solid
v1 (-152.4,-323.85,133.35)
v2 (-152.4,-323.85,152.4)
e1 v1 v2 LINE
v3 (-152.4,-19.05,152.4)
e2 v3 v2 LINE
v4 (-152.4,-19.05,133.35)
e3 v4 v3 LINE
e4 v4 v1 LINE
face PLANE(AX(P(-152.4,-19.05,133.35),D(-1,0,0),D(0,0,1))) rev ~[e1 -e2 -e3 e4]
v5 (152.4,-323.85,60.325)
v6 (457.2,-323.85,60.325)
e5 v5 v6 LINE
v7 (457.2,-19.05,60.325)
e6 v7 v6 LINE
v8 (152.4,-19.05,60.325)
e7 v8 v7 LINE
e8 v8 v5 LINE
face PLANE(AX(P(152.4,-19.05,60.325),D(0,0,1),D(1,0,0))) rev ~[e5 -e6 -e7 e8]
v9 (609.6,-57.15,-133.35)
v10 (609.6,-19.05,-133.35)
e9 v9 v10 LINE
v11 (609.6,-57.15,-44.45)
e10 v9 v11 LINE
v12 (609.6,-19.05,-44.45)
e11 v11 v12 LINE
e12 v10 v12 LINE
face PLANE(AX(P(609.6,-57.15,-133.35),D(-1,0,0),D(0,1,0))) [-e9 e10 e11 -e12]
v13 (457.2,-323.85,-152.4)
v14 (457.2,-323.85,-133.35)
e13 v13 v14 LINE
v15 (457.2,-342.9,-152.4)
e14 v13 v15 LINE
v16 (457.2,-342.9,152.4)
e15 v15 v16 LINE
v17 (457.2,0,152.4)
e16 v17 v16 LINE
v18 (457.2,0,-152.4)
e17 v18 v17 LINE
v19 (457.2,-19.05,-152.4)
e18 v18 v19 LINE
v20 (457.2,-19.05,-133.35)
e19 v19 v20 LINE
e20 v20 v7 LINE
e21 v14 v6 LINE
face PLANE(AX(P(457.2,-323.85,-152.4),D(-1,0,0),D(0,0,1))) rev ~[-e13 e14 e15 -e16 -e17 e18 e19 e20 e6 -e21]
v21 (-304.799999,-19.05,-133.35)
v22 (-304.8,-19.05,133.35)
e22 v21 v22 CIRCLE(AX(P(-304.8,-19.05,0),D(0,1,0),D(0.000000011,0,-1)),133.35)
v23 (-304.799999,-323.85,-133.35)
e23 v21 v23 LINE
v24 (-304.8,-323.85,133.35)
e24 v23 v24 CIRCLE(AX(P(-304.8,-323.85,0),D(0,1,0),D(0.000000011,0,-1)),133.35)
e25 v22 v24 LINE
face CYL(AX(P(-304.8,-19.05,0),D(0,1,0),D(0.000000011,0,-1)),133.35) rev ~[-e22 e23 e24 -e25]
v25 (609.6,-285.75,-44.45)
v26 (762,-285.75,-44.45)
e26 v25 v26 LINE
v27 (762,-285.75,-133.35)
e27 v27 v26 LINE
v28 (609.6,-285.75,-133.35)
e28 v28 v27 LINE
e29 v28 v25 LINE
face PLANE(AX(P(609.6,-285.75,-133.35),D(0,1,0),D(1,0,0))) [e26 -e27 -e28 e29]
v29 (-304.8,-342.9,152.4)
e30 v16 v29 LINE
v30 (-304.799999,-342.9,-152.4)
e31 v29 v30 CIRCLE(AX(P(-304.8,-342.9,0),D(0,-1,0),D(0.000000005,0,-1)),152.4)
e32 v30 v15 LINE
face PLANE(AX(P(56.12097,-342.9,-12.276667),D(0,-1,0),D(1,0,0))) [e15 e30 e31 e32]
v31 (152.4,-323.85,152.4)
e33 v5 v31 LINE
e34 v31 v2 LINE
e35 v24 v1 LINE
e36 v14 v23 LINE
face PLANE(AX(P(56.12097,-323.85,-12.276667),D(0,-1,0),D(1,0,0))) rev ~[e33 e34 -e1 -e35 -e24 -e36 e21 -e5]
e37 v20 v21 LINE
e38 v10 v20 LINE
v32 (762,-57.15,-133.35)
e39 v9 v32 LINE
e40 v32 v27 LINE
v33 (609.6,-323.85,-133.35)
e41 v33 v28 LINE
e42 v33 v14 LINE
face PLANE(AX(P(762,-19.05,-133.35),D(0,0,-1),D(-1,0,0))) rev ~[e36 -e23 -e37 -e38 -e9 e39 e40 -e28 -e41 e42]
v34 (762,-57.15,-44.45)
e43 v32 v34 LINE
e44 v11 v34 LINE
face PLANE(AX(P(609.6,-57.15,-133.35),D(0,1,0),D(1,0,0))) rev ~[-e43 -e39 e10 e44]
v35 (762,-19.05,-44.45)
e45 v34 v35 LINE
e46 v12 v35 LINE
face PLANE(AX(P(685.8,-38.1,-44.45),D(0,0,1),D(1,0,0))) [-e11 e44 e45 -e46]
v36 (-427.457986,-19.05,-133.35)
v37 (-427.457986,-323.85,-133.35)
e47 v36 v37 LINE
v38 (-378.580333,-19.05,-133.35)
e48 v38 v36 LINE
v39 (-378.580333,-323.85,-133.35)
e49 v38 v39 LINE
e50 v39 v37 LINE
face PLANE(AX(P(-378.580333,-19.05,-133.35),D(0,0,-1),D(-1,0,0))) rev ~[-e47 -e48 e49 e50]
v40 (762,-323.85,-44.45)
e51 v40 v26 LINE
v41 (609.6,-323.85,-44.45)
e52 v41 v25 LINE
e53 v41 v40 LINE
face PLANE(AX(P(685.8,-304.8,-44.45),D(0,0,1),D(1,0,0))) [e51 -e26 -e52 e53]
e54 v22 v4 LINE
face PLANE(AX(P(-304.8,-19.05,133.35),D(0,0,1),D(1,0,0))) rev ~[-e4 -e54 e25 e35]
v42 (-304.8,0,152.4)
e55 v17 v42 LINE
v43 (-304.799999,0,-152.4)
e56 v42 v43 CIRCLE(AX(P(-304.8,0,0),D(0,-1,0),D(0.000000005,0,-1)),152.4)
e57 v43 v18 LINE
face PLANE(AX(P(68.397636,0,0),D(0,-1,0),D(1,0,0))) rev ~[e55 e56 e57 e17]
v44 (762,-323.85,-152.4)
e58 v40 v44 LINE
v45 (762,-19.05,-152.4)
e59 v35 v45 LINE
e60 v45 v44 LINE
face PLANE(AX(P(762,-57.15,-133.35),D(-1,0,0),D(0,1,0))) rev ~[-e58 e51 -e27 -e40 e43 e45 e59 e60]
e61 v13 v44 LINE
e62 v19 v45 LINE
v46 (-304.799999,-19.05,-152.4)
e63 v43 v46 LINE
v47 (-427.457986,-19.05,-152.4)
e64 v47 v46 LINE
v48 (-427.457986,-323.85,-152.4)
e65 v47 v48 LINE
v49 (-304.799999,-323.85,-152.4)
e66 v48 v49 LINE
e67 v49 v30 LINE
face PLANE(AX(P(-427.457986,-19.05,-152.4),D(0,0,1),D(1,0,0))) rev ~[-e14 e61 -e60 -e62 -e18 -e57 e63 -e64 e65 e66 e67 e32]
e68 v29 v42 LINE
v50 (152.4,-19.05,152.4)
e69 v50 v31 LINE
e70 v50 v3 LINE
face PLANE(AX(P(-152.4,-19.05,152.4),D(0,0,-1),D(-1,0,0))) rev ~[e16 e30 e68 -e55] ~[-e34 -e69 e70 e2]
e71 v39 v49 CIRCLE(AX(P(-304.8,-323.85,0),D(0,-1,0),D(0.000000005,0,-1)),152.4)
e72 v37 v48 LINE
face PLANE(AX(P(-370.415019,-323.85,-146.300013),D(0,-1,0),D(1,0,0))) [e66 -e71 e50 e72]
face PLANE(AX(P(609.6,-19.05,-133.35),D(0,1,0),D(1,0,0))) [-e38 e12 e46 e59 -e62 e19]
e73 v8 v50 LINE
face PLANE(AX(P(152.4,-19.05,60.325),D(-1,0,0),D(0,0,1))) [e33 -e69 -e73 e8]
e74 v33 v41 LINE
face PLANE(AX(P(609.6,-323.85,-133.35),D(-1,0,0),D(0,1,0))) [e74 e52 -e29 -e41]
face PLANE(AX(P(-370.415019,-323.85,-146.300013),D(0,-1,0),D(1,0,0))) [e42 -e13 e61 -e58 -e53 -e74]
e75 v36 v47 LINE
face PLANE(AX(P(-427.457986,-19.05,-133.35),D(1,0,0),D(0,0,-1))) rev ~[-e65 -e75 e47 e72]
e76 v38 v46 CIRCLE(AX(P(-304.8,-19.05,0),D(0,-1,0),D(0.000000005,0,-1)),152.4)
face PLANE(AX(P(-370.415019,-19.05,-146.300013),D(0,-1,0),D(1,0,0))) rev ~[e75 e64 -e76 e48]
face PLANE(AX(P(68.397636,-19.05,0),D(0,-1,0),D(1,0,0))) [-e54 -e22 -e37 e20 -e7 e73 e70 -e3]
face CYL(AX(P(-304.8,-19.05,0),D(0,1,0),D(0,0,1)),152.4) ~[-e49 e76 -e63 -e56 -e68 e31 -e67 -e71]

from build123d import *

# Parameters (mm, degrees)
F1_DEPTH = 19.05
F2_W     = 304.8
F2_H     = 92.075
F3_DEPTH = 304.8
F4_W     = 304.8
F4_H     = 92.075
F5_DEPTH = 19.05
F6_W     = 304.8
F6_H     = 19.05
F7_DEPTH = 304.8
F8_W     = 152.4
F8_H     = 38.1
F9_DEPTH = 88.9


# Not quite as in the source:
# - a feature names something its author has since deleted; it is built from what else it names


with BuildPart() as f1:
    # F0 (on Front) → F1 (new body)
    with BuildSketch(Plane.XZ):
        with BuildLine():
            Line((457.2, -152.4), (457.2, 152.4))
            Line((457.2, 152.4), (-304.8, 152.4))
            ThreePointArc((-304.8, 152.4), (-197.0369265472, 107.7630734528), (-152.4, 0))
            ThreePointArc((-152.4, 0), (-197.0369262947, -107.7630732004), (-304.799999286, -152.4))
            Line((-304.799999286, -152.4), (457.2, -152.4))
        make_face()
        with BuildLine():
            ThreePointArc((-152.4, 0), (-197.0369265472, 107.7630734528), (-304.8, 152.4))
            ThreePointArc((-304.8, 152.4), (-412.5630734984, 107.7630734073), (-457.2, -1.288e-07))
            ThreePointArc((-457.2, -1.288e-07), (-412.5630731549, -107.7630737508), (-304.799999286, -152.4))
            ThreePointArc((-304.799999286, -152.4), (-197.0369262947, -107.7630732004), (-152.4, 0))
        make_face()
    extrude(amount=F1_DEPTH)

    # F2 (on face) → F3 (join)
    with BuildSketch(Plane.XZ.offset(19.05)):
        with Locations((304.8, 106.3625)):
            Rectangle(F2_W, F2_H)
    extrude(amount=F3_DEPTH)

    # F4 (on face) → F5 (join)
    with BuildSketch(Plane.XZ.offset(323.85)):
        with BuildLine():
            Line((152.4, 60.325), (152.4, 152.4))
            Line((152.4, 152.4), (-304.8, 152.4))
            ThreePointArc((-304.8, 152.4), (-197.0369265472, 107.7630734528), (-152.4, 0))
            ThreePointArc((-152.4, 0), (-197.0369262947, -107.7630732004), (-304.799999286, -152.4))
            Line((-304.799999286, -152.4), (457.2, -152.4))
            Line((457.2, -152.4), (457.2, 60.325))
            Line((457.2, 60.325), (152.4, 60.325))
        make_face()
        with Locations((304.8, 106.3625)):
            Rectangle(F4_W, F4_H)
        with BuildLine():
            ThreePointArc((-152.4, 0), (-197.0369265472, 107.7630734528), (-304.8, 152.4))
            ThreePointArc((-304.8, 152.4), (-412.5630734984, 107.7630734073), (-457.2, -1.288e-07))
            ThreePointArc((-457.2, -1.288e-07), (-412.5630731549, -107.7630737508), (-304.799999286, -152.4))
            ThreePointArc((-304.799999286, -152.4), (-197.0369262947, -107.7630732004), (-152.4, 0))
        make_face()
    extrude(amount=F5_DEPTH)

    # F6 (on face) → F7 (join, through all)
    with BuildSketch(Plane.XZ.offset(19.05)):
        with BuildLine():
            ThreePointArc((-304.799999286, -152.4), (-342.8999996543, -147.5606655798), (-378.5803327453, -133.35))
            Line((-378.5803327453, -133.35), (-427.4579864061, -133.35))
            Line((-427.4579864061, -133.35), (-427.4579864061, -152.4))
            Line((-427.4579864061, -152.4), (-304.799999286, -152.4))
        make_face()
        with BuildLine():
            Line((-152.4, 133.35), (-152.4, 152.4))
            Line((-152.4, 152.4), (-304.8, 152.4))
            ThreePointArc((-304.8, 152.4), (-266.7, 147.5606654905), (-231.0196672547, 133.35))
            Line((-231.0196672547, 133.35), (-152.4, 133.35))
        make_face()
        with BuildLine():
            ThreePointArc((-231.0196672547, 133.35), (-266.7, 147.5606654905), (-304.8, 152.4))
            Line((-304.8, 152.4), (-304.8, 133.35))
            Line((-304.8, 133.35), (-231.0196672547, 133.35))
        make_face()
        with BuildLine():
            Line((-304.8, 133.35), (-304.8, 152.4))
            ThreePointArc((-304.8, 152.4), (-452.3606654905, 38.1), (-378.5803327453, -133.35))
            Line((-378.5803327453, -133.35), (-304.7999985066, -133.35))
            ThreePointArc((-304.7999985066, -133.35), (-438.15, -7.467e-07), (-304.8, 133.35))
        make_face()
        with BuildLine():
            Line((-304.7999985066, -133.35), (-378.5803327453, -133.35))
            ThreePointArc((-378.5803327453, -133.35), (-342.8999996543, -147.5606655798), (-304.799999286, -152.4))
            ThreePointArc((-304.799999286, -152.4), (-266.6999996543, -147.5606654012), (-231.0196672547, -133.35))
            Line((-231.0196672547, -133.35), (-304.7999985066, -133.35))
        make_face()
        with Locations((609.6, -142.875)):
            Rectangle(F6_W, F6_H)
        with BuildLine():
            ThreePointArc((-231.0196672547, -133.35), (-266.6999996543, -147.5606654012), (-304.799999286, -152.4))
            Line((-304.799999286, -152.4), (457.2, -152.4))
            Line((457.2, -152.4), (457.2, -133.35))
            Line((457.2, -133.35), (-231.0196672547, -133.35))
        make_face()
    extrude(amount=F7_DEPTH)

    # F8 (on face) → F9 (join)
    with BuildSketch(Plane.XY.offset(-133.35)):
        with Locations((685.8, -38.1)):
            Rectangle(F8_W, F8_H)
        with Locations((685.8, -304.8)):
            Rectangle(F8_W, F8_H)
    extrude(amount=F9_DEPTH)


solid = f1.part
